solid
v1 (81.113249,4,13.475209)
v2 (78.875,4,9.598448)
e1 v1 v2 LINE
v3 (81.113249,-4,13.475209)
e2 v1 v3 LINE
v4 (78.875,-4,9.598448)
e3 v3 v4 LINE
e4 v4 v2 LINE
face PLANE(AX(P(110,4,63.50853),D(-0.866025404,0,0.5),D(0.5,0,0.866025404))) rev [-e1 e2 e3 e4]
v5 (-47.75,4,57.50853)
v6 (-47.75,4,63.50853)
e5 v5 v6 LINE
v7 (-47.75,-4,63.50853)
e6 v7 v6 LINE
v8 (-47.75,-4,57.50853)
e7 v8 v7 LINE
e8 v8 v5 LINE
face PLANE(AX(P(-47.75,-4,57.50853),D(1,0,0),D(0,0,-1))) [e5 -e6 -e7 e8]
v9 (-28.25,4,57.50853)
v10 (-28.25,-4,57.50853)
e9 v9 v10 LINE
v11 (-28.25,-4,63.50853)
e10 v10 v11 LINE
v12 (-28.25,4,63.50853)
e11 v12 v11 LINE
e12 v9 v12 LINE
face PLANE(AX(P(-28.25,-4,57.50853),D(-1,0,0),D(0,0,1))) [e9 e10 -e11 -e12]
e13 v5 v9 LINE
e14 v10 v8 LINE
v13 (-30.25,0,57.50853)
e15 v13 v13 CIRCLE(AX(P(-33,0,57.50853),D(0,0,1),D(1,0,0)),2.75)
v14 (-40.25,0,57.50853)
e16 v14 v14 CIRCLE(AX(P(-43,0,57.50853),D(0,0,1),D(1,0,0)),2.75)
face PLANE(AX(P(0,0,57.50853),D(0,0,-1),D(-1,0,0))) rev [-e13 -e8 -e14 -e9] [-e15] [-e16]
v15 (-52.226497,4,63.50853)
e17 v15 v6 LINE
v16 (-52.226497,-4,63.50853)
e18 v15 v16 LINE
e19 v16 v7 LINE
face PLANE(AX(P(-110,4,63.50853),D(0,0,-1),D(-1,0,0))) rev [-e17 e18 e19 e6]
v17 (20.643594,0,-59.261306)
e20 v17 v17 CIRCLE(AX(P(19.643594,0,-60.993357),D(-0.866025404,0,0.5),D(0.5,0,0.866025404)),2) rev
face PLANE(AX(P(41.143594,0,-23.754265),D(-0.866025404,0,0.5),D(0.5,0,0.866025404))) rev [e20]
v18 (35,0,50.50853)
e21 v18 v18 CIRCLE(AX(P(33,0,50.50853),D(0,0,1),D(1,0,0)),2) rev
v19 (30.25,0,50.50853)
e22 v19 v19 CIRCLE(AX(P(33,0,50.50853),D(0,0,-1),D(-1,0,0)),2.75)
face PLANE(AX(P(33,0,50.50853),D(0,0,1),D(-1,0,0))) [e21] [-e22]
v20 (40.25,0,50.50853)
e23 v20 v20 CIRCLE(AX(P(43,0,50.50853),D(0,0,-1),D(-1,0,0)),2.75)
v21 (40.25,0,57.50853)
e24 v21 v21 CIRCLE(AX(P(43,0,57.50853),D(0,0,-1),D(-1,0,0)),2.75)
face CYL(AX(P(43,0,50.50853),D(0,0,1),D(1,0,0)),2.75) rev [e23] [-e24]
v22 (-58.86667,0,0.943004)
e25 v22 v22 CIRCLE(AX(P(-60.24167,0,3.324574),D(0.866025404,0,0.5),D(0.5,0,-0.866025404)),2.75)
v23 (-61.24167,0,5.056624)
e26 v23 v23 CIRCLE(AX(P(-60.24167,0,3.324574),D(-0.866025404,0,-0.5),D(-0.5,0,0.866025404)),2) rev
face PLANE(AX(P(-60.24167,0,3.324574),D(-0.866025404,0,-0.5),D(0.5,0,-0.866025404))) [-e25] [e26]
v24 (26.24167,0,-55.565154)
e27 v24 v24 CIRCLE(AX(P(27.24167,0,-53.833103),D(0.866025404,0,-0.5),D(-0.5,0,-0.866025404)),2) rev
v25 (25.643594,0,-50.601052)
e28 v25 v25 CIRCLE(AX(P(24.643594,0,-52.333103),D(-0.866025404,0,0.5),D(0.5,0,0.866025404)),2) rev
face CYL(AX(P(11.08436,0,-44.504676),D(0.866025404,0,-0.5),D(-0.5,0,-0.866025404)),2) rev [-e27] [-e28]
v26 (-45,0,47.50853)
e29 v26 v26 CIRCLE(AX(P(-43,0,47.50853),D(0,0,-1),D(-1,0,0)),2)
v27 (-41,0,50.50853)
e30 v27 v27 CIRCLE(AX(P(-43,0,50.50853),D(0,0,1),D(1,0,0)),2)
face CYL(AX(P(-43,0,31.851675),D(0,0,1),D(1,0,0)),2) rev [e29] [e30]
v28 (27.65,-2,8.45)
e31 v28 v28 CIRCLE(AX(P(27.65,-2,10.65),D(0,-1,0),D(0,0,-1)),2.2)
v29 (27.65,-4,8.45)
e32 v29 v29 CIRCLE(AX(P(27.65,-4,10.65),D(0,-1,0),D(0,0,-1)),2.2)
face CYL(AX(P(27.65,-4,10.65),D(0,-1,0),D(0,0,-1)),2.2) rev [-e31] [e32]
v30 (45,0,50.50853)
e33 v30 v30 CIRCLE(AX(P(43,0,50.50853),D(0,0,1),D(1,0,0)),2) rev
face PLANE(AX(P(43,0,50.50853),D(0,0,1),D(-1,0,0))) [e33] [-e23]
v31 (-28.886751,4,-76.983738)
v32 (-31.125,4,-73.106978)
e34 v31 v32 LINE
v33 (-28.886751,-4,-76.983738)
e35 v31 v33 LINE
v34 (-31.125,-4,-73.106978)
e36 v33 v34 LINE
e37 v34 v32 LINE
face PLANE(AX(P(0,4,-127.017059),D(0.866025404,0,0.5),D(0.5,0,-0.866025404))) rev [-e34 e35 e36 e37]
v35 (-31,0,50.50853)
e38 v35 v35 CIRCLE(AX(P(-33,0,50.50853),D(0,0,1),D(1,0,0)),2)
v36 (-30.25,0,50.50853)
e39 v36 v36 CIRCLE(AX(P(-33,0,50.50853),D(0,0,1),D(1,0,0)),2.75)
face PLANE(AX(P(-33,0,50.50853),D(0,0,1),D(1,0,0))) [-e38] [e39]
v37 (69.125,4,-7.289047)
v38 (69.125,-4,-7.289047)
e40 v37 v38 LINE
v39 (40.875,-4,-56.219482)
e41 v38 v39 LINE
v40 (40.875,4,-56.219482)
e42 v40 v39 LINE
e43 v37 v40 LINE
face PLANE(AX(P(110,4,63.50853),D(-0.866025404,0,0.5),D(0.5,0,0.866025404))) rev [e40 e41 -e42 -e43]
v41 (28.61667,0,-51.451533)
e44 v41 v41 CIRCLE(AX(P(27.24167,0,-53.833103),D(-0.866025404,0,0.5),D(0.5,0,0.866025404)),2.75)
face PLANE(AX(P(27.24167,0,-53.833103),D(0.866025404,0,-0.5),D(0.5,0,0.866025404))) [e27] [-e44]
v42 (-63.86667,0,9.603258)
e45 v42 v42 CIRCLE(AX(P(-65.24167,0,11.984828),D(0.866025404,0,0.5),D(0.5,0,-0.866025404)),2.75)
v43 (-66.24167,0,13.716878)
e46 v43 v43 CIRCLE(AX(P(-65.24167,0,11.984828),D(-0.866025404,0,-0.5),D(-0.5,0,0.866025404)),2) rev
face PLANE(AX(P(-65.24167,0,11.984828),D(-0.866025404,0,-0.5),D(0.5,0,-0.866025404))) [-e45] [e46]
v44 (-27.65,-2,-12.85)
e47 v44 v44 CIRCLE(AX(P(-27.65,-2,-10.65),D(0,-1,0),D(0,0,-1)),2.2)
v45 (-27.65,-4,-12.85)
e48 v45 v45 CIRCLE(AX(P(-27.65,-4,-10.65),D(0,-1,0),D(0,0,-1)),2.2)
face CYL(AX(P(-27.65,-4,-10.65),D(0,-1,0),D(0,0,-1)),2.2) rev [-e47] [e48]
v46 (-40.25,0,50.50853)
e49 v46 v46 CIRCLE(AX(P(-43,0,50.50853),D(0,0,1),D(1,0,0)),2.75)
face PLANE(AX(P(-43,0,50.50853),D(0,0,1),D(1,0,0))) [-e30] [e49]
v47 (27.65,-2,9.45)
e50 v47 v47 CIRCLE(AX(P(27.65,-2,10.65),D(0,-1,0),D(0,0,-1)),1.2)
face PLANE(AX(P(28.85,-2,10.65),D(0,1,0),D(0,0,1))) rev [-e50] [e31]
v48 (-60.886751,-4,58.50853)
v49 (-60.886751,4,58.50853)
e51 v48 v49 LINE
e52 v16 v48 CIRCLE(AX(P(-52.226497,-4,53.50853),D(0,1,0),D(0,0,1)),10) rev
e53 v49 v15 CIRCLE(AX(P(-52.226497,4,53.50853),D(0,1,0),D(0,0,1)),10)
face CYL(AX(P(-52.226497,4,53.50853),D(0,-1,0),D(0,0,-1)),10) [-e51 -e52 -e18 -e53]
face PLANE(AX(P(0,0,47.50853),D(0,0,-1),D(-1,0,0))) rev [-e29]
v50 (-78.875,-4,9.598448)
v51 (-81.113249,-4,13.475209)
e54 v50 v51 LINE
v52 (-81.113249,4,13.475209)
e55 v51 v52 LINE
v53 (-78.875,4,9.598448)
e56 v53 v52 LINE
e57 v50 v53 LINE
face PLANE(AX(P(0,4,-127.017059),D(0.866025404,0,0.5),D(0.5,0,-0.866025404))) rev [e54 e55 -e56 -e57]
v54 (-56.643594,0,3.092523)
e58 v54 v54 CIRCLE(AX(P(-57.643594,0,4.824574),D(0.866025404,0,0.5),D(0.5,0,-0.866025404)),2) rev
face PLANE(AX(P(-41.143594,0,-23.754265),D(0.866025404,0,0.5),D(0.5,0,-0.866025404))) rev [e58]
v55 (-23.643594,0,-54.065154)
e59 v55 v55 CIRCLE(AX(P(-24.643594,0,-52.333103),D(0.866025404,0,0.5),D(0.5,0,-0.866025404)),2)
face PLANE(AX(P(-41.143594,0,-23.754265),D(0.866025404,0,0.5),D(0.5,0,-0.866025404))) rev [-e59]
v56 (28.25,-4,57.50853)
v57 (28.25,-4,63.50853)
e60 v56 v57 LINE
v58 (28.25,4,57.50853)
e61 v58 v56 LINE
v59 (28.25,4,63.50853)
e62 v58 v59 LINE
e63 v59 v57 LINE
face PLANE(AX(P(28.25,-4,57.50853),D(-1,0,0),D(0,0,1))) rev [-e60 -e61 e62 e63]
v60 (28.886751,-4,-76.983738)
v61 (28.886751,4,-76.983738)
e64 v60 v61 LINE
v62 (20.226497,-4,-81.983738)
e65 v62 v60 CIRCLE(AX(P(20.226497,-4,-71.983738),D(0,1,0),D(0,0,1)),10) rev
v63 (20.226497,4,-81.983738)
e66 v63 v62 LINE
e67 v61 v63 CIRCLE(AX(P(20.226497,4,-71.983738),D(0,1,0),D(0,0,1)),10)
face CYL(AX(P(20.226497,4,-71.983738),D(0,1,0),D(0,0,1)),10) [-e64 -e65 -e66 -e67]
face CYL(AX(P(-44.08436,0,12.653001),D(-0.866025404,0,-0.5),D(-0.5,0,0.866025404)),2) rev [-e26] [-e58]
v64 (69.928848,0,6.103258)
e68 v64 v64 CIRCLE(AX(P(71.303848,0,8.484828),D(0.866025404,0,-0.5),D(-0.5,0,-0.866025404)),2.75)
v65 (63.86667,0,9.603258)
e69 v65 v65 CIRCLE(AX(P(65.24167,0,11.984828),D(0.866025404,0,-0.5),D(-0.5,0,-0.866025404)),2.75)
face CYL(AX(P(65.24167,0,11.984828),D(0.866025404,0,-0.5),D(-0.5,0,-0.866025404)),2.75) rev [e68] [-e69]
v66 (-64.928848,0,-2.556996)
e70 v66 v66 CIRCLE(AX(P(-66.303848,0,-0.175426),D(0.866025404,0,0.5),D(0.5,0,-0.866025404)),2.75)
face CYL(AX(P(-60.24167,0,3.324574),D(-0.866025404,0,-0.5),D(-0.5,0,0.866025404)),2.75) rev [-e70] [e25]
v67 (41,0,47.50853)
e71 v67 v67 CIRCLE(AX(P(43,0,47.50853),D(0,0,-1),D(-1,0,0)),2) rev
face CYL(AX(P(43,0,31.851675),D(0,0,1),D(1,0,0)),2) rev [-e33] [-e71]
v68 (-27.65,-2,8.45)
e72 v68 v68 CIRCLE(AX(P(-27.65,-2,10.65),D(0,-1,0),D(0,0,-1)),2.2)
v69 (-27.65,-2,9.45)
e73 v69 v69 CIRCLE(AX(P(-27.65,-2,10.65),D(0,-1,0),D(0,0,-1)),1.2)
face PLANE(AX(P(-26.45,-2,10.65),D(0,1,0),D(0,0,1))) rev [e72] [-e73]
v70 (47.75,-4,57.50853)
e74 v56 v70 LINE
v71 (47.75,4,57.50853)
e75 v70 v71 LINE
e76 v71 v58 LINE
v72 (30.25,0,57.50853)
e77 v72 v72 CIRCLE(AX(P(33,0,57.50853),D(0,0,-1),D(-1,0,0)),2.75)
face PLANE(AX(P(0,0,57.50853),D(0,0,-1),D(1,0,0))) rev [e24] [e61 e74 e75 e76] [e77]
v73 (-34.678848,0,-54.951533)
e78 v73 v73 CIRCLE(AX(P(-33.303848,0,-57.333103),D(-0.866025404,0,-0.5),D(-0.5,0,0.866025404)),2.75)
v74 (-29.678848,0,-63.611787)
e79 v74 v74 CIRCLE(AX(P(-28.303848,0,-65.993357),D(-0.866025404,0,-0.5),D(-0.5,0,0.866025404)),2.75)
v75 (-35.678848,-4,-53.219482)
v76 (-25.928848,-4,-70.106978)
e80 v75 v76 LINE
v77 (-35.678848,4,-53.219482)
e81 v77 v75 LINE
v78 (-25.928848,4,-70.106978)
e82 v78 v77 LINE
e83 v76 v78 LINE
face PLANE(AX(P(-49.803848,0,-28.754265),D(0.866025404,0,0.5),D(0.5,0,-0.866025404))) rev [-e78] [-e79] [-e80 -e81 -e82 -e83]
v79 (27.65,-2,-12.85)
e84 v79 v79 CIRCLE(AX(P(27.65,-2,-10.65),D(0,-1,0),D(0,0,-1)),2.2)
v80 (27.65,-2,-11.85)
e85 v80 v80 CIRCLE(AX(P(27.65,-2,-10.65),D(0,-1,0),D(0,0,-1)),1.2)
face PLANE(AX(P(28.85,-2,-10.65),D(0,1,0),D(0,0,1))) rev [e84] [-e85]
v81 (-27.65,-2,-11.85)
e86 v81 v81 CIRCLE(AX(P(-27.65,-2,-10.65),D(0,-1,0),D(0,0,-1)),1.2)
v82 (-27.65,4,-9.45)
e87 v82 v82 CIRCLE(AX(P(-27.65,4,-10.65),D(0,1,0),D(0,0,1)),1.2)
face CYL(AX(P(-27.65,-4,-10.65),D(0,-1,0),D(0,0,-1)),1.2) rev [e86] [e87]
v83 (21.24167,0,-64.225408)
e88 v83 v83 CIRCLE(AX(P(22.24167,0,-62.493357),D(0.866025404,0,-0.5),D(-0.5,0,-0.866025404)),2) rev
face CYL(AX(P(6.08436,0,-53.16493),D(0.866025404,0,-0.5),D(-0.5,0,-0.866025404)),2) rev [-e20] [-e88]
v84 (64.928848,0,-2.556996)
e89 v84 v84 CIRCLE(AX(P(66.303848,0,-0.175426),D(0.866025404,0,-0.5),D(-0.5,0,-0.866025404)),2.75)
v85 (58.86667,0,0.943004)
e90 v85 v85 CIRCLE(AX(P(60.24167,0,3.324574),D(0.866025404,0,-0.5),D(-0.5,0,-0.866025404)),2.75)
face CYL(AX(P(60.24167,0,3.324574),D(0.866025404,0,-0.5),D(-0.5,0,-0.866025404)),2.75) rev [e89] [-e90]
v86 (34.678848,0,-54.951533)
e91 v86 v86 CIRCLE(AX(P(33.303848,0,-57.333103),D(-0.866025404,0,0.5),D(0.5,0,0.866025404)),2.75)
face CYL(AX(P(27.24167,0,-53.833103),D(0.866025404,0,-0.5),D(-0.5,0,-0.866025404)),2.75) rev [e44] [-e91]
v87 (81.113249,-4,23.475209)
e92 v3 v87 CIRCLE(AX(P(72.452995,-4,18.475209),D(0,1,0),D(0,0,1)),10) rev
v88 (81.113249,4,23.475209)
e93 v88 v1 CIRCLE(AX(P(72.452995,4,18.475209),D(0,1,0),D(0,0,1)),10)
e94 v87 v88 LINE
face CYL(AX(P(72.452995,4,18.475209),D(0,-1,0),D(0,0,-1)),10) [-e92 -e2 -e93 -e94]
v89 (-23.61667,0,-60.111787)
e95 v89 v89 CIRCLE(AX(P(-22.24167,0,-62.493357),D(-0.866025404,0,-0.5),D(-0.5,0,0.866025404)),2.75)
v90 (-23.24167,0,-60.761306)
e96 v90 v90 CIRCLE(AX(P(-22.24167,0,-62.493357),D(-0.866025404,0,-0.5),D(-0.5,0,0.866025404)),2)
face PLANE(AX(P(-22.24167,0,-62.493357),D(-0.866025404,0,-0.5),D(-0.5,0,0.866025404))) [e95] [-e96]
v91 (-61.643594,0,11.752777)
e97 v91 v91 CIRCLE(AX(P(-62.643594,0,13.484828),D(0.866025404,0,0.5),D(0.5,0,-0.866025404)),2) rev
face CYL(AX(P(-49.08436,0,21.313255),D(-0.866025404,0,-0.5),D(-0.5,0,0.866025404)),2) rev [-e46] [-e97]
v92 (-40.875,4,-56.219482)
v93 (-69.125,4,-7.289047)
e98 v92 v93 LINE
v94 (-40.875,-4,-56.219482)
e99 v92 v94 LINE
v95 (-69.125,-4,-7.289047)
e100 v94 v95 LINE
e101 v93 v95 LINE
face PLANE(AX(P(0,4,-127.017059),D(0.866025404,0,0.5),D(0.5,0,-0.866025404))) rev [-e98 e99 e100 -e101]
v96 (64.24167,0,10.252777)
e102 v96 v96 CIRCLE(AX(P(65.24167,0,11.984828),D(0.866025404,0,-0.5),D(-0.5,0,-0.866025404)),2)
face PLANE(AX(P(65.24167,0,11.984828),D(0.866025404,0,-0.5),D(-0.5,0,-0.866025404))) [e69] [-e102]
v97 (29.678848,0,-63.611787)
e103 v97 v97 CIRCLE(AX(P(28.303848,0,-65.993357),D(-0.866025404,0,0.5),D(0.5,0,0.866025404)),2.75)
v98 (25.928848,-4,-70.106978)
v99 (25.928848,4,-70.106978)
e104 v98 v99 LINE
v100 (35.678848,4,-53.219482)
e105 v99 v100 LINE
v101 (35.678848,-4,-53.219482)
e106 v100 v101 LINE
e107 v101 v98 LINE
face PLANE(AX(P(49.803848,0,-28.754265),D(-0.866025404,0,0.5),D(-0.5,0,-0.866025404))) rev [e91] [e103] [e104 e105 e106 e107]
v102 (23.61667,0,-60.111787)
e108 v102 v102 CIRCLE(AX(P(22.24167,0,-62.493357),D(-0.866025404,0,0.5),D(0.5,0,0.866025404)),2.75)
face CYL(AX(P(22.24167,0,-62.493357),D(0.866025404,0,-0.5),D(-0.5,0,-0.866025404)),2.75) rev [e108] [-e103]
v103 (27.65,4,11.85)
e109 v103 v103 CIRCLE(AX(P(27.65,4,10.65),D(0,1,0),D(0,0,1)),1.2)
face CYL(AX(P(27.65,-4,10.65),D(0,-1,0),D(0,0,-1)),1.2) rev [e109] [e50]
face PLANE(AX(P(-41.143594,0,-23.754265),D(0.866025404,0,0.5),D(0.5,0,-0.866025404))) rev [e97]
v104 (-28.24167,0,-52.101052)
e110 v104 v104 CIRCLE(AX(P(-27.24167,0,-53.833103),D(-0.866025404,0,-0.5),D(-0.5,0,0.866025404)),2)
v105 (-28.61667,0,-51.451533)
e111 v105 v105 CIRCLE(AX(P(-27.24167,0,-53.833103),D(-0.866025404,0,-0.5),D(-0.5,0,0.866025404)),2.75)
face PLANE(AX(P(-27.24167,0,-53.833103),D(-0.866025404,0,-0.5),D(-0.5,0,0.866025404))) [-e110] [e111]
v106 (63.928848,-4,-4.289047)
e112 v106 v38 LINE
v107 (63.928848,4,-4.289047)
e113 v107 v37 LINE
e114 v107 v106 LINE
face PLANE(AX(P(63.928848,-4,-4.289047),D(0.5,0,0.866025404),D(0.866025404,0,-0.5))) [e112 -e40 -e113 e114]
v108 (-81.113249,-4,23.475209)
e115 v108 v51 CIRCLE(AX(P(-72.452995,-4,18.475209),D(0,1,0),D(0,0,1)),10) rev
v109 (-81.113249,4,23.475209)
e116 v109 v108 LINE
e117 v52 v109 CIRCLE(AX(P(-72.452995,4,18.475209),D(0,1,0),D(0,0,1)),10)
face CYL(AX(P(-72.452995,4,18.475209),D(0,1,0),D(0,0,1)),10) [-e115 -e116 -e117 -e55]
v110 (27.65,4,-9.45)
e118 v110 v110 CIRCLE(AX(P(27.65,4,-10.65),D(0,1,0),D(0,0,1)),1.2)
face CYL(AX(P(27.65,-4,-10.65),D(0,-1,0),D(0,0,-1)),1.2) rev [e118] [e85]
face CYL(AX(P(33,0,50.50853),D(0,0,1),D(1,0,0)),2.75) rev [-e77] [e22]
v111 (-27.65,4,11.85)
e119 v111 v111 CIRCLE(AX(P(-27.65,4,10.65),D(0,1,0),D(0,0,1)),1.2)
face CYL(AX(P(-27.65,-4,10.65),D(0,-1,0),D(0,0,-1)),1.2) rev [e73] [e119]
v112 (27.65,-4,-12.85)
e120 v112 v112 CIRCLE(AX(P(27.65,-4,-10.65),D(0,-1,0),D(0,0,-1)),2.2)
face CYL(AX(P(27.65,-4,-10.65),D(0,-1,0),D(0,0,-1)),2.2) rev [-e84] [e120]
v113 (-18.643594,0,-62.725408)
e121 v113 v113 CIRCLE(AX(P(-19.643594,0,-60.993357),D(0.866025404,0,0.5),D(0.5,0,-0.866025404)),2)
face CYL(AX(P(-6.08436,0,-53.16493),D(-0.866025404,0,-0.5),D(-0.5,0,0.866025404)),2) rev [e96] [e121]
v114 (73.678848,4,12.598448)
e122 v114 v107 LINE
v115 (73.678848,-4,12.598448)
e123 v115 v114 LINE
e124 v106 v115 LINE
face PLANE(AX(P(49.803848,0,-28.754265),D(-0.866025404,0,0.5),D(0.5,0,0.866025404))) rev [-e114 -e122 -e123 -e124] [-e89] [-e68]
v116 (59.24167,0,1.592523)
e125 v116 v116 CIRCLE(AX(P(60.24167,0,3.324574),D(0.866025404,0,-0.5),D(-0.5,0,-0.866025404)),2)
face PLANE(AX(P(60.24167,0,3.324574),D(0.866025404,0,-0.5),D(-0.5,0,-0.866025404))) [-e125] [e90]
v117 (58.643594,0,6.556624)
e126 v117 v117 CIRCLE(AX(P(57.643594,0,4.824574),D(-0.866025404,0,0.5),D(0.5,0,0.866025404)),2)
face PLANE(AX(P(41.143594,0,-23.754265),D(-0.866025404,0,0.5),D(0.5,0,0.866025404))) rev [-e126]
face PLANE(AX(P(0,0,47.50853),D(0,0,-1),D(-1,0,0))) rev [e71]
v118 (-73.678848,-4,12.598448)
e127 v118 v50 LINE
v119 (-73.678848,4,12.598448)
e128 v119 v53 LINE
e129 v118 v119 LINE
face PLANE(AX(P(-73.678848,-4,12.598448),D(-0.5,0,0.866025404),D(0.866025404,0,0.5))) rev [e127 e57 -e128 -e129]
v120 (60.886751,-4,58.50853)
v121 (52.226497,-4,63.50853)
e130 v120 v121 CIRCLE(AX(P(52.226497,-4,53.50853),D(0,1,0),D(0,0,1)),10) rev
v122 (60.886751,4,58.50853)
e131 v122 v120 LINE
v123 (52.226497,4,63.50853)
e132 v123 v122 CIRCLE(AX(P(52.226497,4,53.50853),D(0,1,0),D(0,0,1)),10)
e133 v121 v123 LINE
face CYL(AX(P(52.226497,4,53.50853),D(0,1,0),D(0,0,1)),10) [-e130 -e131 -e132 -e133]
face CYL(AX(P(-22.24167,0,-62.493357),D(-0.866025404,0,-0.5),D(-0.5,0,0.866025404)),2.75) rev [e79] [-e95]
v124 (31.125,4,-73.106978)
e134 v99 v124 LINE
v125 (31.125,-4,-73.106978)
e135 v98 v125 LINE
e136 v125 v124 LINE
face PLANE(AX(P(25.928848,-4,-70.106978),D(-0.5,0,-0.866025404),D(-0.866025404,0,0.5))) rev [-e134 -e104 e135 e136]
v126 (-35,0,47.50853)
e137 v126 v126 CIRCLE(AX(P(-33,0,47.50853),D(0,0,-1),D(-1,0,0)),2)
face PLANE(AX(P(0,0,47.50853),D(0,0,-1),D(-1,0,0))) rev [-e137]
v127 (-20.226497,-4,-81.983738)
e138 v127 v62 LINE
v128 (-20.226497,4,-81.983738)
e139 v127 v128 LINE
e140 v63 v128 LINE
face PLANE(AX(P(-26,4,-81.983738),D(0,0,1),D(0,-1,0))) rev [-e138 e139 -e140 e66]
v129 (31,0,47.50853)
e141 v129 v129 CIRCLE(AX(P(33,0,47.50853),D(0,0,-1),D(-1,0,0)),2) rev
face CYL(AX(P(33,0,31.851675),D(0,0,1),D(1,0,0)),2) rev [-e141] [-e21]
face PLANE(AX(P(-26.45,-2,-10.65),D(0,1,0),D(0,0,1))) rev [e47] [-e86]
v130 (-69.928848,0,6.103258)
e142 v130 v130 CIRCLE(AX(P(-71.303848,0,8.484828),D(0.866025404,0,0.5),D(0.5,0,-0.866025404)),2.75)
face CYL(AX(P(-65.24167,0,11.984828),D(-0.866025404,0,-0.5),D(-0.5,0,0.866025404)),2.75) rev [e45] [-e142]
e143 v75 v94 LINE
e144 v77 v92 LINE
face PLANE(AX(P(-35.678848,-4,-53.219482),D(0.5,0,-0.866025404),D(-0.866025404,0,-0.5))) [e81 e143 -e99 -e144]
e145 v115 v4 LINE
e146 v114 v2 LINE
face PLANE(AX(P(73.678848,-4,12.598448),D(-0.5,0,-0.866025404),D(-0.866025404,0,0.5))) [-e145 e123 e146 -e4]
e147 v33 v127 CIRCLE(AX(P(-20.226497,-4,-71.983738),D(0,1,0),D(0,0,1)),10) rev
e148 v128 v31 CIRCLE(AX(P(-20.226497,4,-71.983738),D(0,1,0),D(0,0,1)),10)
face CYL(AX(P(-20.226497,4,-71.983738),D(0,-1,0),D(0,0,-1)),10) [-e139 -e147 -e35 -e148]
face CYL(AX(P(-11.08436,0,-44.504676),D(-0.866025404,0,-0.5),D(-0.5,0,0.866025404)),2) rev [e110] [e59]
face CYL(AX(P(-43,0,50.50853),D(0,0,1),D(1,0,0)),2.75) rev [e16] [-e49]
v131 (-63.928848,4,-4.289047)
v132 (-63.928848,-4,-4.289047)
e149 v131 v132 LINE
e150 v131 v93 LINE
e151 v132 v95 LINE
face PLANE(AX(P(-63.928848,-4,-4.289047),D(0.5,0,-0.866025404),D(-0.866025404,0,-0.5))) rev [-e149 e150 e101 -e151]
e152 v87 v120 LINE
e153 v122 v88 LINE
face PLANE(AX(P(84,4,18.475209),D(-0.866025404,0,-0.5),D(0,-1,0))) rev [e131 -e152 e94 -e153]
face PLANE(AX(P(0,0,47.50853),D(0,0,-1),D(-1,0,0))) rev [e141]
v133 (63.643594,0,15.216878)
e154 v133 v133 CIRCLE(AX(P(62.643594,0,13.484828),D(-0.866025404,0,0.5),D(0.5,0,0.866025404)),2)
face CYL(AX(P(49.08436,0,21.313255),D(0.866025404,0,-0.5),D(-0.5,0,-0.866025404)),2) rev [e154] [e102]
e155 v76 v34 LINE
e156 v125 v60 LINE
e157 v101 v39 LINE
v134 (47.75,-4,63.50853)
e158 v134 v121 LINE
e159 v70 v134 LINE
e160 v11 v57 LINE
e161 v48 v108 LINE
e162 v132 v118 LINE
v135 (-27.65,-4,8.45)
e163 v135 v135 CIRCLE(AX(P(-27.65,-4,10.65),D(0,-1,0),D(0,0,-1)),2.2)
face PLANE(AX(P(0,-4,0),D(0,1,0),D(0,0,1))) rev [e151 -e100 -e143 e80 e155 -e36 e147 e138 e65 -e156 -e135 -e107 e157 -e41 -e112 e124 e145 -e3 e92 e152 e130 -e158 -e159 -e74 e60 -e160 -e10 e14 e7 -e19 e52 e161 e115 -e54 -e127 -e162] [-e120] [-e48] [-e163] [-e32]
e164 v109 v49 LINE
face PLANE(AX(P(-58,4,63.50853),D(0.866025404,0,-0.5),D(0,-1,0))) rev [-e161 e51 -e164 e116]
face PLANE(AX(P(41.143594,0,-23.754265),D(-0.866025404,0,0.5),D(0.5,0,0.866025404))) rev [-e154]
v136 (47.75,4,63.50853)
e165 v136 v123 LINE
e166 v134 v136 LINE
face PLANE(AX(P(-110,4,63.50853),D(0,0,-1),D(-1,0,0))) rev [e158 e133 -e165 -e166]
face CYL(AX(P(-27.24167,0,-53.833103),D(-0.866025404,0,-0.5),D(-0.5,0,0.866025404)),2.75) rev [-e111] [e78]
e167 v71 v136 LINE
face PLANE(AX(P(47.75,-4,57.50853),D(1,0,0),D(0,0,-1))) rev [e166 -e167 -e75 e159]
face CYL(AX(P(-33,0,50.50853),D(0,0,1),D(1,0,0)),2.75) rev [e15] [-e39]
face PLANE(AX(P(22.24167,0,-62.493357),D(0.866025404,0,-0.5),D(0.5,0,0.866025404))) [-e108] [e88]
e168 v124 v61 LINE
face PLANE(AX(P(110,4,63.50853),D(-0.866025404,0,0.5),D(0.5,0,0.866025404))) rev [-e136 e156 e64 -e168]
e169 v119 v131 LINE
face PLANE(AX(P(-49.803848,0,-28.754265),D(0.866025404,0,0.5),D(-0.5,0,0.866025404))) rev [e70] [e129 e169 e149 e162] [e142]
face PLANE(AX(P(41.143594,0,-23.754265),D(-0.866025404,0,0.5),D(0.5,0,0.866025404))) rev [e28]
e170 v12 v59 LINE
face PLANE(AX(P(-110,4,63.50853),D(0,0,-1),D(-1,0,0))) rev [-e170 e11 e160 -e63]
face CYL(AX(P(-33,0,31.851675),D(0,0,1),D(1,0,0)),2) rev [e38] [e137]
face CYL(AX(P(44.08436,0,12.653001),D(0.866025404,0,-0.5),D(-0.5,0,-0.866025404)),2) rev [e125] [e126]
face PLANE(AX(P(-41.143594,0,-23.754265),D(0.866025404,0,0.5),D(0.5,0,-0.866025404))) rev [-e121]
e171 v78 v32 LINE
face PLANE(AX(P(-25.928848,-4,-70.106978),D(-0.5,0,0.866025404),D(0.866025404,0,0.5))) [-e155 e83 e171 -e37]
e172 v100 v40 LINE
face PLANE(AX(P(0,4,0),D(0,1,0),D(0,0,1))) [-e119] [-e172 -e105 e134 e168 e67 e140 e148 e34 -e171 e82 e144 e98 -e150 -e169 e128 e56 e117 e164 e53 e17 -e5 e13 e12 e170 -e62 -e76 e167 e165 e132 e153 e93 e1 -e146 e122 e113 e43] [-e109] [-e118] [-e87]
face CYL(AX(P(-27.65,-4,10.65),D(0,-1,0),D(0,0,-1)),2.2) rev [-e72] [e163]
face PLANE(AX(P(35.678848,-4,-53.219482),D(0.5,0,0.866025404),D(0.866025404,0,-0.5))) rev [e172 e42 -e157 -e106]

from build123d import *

# Parameters (mm, degrees)
BOSS_EXTRUDE1_DEPTH            = 4
CHAMFER1_SIZE                  = 52
SKETCH4_W                      = 19.5
SKETCH4_H                      = 8
SKETCH4_R                      = 2
CUT_EXTRUDE1_DEPTH             = 6
SKETCH4_2_R                    = 2
CUT_EXTRUDE2_DEPTH             = 16
SKETCH9_R                      = 2.75
CUT_EXTRUDE3_DEPTH             = 7
CRVPATTERN1_START              = -63.508529611
CRVPATTERN1_OUTLINE_W          = 19.5
CRVPATTERN1_OUTLINE_H          = 8
CRVPATTERN1_DEPTH              = 6
CRVPATTERN1_START_2            = -57.508529611
CRVPATTERN1_2_OUTLINE_R        = 2.75
CRVPATTERN1_2_DEPTH            = 7
CRVPATTERN1_START_3            = -50.508529611
CRVPATTERN1_3_OUTLINE_R        = 2
CRVPATTERN1_3_DEPTH            = 3
CRVPATTERN1_START_4            = 57.508529611
CRVPATTERN1_4_OUTLINE_W        = 19.5
CRVPATTERN1_4_OUTLINE_H        = 8
CRVPATTERN1_4_DEPTH            = 6
CRVPATTERN1_START_5            = 50.508529611
CRVPATTERN1_5_OUTLINE_R        = 2.75
CRVPATTERN1_5_DEPTH            = 7
CRVPATTERN1_START_6            = 47.508529611
CRVPATTERN1_6_OUTLINE_R        = 2
CRVPATTERN1_6_DEPTH            = 3
FILLET1_R                      = 10
CBORE_FOR_M2_SHCS1_D           = 2.4
CBORE_FOR_M2_SHCS1_CBORE_D     = 4.4
CBORE_FOR_M2_SHCS1_CBORE_DEPTH = 2


# Read off the part's stored shape, not the designer's step: CrvPattern1
with BuildPart() as part:
    # Sketch1 → Boss-Extrude1 (new, symmetric)
    with BuildSketch(Plane(origin=(0, 0, 0), x_dir=(1, 0, 0), z_dir=(0, 1, 0))):
        Polygon((110, -63.508529611), (0, 127.017059222), (-110, -63.508529611), align=None)
    extrude(amount=BOSS_EXTRUDE1_DEPTH, both=True)

    # Chamfer1
    chamfer1_edges = [part.edges().sort_by_distance(p)[0] for p in [
        (-110, 0, 63.508529611),
        (0, 0, -127.017059222),
        (110, 0, 63.508529611),
    ]]
    chamfer(chamfer1_edges, length=CHAMFER1_SIZE)

    # Sketch4 → Cut-Extrude1 (cut)
    with BuildSketch(Plane(origin=(4.375288244, 0, 63.508529611), x_dir=(-1, 0, 0), z_dir=(0, 0, -1))):
        with Locations((42.375288244, 0)):
            Rectangle(SKETCH4_W, SKETCH4_H)
        with Locations((37.375288244, 0)):
            Circle(SKETCH4_R, mode=Mode.SUBTRACT)
        with Locations((47.375288244, 0)):
            Circle(SKETCH4_R, mode=Mode.SUBTRACT)
    cut_extrude1 = extrude(amount=CUT_EXTRUDE1_DEPTH, mode=Mode.SUBTRACT)

    # Sketch4<2> → Cut-Extrude2 (cut)
    with BuildSketch(Plane(origin=(4.375288244, 0, 63.508529611), x_dir=(-1, 0, 0), z_dir=(0, 0, -1))):
        with Locations((47.375288244, 0)):
            Circle(SKETCH4_2_R)
        with Locations((37.375288244, 0)):
            Circle(SKETCH4_2_R)
    cut_extrude2 = extrude(amount=CUT_EXTRUDE2_DEPTH, mode=Mode.SUBTRACT)

    # Sketch9 → Cut-Extrude3 (cut)
    with BuildSketch(Plane.XY.offset(57.508529611)):
        with Locations((-43, 0)):
            Circle(SKETCH9_R)
        with Locations((-33, 0)):
            Circle(SKETCH9_R)
    cut_extrude3 = extrude(amount=-CUT_EXTRUDE3_DEPTH, mode=Mode.SUBTRACT)

    # Mirror1: Cut-Extrude1, Cut-Extrude2, Cut-Extrude3 across plane
    add(cut_extrude1.mirror(Plane(origin=(0, 0, 0), x_dir=(0, 0, 1), z_dir=(1, 0, 0))), mode=Mode.SUBTRACT)
    add(cut_extrude2.mirror(Plane(origin=(0, 0, 0), x_dir=(0, 0, 1), z_dir=(1, 0, 0))), mode=Mode.SUBTRACT)
    add(cut_extrude3.mirror(Plane(origin=(0, 0, 0), x_dir=(0, 0, 1), z_dir=(1, 0, 0))), mode=Mode.SUBTRACT)

    # CrvPattern1 outline → CrvPattern1 (cut)
    with BuildSketch(Plane(origin=(0, 0, 0), x_dir=(0.499999999999987, 0, -0.8660254037844463), z_dir=(0.8660254037844461, 0, 0.49999999999998707)).offset(CRVPATTERN1_START)):
        with Locations((-38, 0)):
            Rectangle(CRVPATTERN1_OUTLINE_W, CRVPATTERN1_OUTLINE_H)
        with Locations((38, 0)):
            Rectangle(CRVPATTERN1_OUTLINE_W, CRVPATTERN1_OUTLINE_H)
    extrude(amount=CRVPATTERN1_DEPTH, mode=Mode.SUBTRACT)

    # CrvPattern1 2 outline → CrvPattern1 2 (cut)
    with BuildSketch(Plane(origin=(0, 0, 0), x_dir=(0.499999999999987, 0, -0.8660254037844463), z_dir=(0.8660254037844461, 0, 0.49999999999998707)).offset(CRVPATTERN1_START_2)):
        with Locations((-43, 0)):
            Circle(CRVPATTERN1_2_OUTLINE_R)
        with Locations((-33, 0)):
            Circle(CRVPATTERN1_2_OUTLINE_R)
        with Locations((33, 0)):
            Circle(CRVPATTERN1_2_OUTLINE_R)
        with Locations((43, 0)):
            Circle(CRVPATTERN1_2_OUTLINE_R)
    extrude(amount=CRVPATTERN1_2_DEPTH, mode=Mode.SUBTRACT)

    # CrvPattern1 3 outline → CrvPattern1 3 (cut)
    with BuildSketch(Plane(origin=(0, 0, 0), x_dir=(0.499999999999987, 0, -0.8660254037844463), z_dir=(0.8660254037844461, 0, 0.49999999999998707)).offset(CRVPATTERN1_START_3)):
        with Locations((-43, 0)):
            Circle(CRVPATTERN1_3_OUTLINE_R)
        with Locations((-33, 0)):
            Circle(CRVPATTERN1_3_OUTLINE_R)
        with Locations((33, 0)):
            Circle(CRVPATTERN1_3_OUTLINE_R)
        with Locations((43, 0)):
            Circle(CRVPATTERN1_3_OUTLINE_R)
    extrude(amount=CRVPATTERN1_3_DEPTH, mode=Mode.SUBTRACT)

    # CrvPattern1 4 outline → CrvPattern1 4 (cut)
    with BuildSketch(Plane(origin=(0, 0, 0), x_dir=(0.500000000000001, 0, 0.866025403784438), z_dir=(0.866025403784438, 0, -0.500000000000001)).offset(CRVPATTERN1_START_4)):
        with Locations((-38, 0)):
            Rectangle(CRVPATTERN1_4_OUTLINE_W, CRVPATTERN1_4_OUTLINE_H)
        with Locations((38, 0)):
            Rectangle(CRVPATTERN1_4_OUTLINE_W, CRVPATTERN1_4_OUTLINE_H)
    extrude(amount=CRVPATTERN1_4_DEPTH, mode=Mode.SUBTRACT)

    # CrvPattern1 5 outline → CrvPattern1 5 (cut)
    with BuildSketch(Plane(origin=(0, 0, 0), x_dir=(0.500000000000001, 0, 0.866025403784438), z_dir=(0.866025403784438, 0, -0.500000000000001)).offset(CRVPATTERN1_START_5)):
        with Locations((-43, 0)):
            Circle(CRVPATTERN1_5_OUTLINE_R)
        with Locations((-33, 0)):
            Circle(CRVPATTERN1_5_OUTLINE_R)
        with Locations((33, 0)):
            Circle(CRVPATTERN1_5_OUTLINE_R)
        with Locations((43, 0)):
            Circle(CRVPATTERN1_5_OUTLINE_R)
    extrude(amount=CRVPATTERN1_5_DEPTH, mode=Mode.SUBTRACT)

    # CrvPattern1 6 outline → CrvPattern1 6 (cut)
    with BuildSketch(Plane(origin=(0, 0, 0), x_dir=(0.500000000000001, 0, 0.866025403784438), z_dir=(0.866025403784438, 0, -0.500000000000001)).offset(CRVPATTERN1_START_6)):
        with Locations((-43, 0)):
            Circle(CRVPATTERN1_6_OUTLINE_R)
        with Locations((-33, 0)):
            Circle(CRVPATTERN1_6_OUTLINE_R)
        with Locations((33, 0)):
            Circle(CRVPATTERN1_6_OUTLINE_R)
        with Locations((43, 0)):
            Circle(CRVPATTERN1_6_OUTLINE_R)
    extrude(amount=CRVPATTERN1_6_DEPTH, mode=Mode.SUBTRACT)

    # Fillet1
    fillet1_edges = [part.edges().sort_by_distance(p)[0] for p in [
        (58, 0, 63.508529611),
        (-58, 0, 63.508529611),
        (-26, 0, -81.983738225),
        (-84, 0, 18.475208614),
        (26, 0, -81.983738225),
        (84, 0, 18.475208614),
    ]]
    fillet(fillet1_edges, radius=FILLET1_R)

    # CBORE for M2 SHCS1 (through all)
    with Locations(Plane(origin=(0, -4, 0), x_dir=(-1, 0, 0), z_dir=(0, -1, 0))):
        with Locations((-27.65, -10.65), (27.65, 10.65), (27.65, -10.65), (-27.65, 10.65)):
            CounterBoreHole(CBORE_FOR_M2_SHCS1_D / 2, CBORE_FOR_M2_SHCS1_CBORE_D / 2, CBORE_FOR_M2_SHCS1_CBORE_DEPTH)


solid = part.part
